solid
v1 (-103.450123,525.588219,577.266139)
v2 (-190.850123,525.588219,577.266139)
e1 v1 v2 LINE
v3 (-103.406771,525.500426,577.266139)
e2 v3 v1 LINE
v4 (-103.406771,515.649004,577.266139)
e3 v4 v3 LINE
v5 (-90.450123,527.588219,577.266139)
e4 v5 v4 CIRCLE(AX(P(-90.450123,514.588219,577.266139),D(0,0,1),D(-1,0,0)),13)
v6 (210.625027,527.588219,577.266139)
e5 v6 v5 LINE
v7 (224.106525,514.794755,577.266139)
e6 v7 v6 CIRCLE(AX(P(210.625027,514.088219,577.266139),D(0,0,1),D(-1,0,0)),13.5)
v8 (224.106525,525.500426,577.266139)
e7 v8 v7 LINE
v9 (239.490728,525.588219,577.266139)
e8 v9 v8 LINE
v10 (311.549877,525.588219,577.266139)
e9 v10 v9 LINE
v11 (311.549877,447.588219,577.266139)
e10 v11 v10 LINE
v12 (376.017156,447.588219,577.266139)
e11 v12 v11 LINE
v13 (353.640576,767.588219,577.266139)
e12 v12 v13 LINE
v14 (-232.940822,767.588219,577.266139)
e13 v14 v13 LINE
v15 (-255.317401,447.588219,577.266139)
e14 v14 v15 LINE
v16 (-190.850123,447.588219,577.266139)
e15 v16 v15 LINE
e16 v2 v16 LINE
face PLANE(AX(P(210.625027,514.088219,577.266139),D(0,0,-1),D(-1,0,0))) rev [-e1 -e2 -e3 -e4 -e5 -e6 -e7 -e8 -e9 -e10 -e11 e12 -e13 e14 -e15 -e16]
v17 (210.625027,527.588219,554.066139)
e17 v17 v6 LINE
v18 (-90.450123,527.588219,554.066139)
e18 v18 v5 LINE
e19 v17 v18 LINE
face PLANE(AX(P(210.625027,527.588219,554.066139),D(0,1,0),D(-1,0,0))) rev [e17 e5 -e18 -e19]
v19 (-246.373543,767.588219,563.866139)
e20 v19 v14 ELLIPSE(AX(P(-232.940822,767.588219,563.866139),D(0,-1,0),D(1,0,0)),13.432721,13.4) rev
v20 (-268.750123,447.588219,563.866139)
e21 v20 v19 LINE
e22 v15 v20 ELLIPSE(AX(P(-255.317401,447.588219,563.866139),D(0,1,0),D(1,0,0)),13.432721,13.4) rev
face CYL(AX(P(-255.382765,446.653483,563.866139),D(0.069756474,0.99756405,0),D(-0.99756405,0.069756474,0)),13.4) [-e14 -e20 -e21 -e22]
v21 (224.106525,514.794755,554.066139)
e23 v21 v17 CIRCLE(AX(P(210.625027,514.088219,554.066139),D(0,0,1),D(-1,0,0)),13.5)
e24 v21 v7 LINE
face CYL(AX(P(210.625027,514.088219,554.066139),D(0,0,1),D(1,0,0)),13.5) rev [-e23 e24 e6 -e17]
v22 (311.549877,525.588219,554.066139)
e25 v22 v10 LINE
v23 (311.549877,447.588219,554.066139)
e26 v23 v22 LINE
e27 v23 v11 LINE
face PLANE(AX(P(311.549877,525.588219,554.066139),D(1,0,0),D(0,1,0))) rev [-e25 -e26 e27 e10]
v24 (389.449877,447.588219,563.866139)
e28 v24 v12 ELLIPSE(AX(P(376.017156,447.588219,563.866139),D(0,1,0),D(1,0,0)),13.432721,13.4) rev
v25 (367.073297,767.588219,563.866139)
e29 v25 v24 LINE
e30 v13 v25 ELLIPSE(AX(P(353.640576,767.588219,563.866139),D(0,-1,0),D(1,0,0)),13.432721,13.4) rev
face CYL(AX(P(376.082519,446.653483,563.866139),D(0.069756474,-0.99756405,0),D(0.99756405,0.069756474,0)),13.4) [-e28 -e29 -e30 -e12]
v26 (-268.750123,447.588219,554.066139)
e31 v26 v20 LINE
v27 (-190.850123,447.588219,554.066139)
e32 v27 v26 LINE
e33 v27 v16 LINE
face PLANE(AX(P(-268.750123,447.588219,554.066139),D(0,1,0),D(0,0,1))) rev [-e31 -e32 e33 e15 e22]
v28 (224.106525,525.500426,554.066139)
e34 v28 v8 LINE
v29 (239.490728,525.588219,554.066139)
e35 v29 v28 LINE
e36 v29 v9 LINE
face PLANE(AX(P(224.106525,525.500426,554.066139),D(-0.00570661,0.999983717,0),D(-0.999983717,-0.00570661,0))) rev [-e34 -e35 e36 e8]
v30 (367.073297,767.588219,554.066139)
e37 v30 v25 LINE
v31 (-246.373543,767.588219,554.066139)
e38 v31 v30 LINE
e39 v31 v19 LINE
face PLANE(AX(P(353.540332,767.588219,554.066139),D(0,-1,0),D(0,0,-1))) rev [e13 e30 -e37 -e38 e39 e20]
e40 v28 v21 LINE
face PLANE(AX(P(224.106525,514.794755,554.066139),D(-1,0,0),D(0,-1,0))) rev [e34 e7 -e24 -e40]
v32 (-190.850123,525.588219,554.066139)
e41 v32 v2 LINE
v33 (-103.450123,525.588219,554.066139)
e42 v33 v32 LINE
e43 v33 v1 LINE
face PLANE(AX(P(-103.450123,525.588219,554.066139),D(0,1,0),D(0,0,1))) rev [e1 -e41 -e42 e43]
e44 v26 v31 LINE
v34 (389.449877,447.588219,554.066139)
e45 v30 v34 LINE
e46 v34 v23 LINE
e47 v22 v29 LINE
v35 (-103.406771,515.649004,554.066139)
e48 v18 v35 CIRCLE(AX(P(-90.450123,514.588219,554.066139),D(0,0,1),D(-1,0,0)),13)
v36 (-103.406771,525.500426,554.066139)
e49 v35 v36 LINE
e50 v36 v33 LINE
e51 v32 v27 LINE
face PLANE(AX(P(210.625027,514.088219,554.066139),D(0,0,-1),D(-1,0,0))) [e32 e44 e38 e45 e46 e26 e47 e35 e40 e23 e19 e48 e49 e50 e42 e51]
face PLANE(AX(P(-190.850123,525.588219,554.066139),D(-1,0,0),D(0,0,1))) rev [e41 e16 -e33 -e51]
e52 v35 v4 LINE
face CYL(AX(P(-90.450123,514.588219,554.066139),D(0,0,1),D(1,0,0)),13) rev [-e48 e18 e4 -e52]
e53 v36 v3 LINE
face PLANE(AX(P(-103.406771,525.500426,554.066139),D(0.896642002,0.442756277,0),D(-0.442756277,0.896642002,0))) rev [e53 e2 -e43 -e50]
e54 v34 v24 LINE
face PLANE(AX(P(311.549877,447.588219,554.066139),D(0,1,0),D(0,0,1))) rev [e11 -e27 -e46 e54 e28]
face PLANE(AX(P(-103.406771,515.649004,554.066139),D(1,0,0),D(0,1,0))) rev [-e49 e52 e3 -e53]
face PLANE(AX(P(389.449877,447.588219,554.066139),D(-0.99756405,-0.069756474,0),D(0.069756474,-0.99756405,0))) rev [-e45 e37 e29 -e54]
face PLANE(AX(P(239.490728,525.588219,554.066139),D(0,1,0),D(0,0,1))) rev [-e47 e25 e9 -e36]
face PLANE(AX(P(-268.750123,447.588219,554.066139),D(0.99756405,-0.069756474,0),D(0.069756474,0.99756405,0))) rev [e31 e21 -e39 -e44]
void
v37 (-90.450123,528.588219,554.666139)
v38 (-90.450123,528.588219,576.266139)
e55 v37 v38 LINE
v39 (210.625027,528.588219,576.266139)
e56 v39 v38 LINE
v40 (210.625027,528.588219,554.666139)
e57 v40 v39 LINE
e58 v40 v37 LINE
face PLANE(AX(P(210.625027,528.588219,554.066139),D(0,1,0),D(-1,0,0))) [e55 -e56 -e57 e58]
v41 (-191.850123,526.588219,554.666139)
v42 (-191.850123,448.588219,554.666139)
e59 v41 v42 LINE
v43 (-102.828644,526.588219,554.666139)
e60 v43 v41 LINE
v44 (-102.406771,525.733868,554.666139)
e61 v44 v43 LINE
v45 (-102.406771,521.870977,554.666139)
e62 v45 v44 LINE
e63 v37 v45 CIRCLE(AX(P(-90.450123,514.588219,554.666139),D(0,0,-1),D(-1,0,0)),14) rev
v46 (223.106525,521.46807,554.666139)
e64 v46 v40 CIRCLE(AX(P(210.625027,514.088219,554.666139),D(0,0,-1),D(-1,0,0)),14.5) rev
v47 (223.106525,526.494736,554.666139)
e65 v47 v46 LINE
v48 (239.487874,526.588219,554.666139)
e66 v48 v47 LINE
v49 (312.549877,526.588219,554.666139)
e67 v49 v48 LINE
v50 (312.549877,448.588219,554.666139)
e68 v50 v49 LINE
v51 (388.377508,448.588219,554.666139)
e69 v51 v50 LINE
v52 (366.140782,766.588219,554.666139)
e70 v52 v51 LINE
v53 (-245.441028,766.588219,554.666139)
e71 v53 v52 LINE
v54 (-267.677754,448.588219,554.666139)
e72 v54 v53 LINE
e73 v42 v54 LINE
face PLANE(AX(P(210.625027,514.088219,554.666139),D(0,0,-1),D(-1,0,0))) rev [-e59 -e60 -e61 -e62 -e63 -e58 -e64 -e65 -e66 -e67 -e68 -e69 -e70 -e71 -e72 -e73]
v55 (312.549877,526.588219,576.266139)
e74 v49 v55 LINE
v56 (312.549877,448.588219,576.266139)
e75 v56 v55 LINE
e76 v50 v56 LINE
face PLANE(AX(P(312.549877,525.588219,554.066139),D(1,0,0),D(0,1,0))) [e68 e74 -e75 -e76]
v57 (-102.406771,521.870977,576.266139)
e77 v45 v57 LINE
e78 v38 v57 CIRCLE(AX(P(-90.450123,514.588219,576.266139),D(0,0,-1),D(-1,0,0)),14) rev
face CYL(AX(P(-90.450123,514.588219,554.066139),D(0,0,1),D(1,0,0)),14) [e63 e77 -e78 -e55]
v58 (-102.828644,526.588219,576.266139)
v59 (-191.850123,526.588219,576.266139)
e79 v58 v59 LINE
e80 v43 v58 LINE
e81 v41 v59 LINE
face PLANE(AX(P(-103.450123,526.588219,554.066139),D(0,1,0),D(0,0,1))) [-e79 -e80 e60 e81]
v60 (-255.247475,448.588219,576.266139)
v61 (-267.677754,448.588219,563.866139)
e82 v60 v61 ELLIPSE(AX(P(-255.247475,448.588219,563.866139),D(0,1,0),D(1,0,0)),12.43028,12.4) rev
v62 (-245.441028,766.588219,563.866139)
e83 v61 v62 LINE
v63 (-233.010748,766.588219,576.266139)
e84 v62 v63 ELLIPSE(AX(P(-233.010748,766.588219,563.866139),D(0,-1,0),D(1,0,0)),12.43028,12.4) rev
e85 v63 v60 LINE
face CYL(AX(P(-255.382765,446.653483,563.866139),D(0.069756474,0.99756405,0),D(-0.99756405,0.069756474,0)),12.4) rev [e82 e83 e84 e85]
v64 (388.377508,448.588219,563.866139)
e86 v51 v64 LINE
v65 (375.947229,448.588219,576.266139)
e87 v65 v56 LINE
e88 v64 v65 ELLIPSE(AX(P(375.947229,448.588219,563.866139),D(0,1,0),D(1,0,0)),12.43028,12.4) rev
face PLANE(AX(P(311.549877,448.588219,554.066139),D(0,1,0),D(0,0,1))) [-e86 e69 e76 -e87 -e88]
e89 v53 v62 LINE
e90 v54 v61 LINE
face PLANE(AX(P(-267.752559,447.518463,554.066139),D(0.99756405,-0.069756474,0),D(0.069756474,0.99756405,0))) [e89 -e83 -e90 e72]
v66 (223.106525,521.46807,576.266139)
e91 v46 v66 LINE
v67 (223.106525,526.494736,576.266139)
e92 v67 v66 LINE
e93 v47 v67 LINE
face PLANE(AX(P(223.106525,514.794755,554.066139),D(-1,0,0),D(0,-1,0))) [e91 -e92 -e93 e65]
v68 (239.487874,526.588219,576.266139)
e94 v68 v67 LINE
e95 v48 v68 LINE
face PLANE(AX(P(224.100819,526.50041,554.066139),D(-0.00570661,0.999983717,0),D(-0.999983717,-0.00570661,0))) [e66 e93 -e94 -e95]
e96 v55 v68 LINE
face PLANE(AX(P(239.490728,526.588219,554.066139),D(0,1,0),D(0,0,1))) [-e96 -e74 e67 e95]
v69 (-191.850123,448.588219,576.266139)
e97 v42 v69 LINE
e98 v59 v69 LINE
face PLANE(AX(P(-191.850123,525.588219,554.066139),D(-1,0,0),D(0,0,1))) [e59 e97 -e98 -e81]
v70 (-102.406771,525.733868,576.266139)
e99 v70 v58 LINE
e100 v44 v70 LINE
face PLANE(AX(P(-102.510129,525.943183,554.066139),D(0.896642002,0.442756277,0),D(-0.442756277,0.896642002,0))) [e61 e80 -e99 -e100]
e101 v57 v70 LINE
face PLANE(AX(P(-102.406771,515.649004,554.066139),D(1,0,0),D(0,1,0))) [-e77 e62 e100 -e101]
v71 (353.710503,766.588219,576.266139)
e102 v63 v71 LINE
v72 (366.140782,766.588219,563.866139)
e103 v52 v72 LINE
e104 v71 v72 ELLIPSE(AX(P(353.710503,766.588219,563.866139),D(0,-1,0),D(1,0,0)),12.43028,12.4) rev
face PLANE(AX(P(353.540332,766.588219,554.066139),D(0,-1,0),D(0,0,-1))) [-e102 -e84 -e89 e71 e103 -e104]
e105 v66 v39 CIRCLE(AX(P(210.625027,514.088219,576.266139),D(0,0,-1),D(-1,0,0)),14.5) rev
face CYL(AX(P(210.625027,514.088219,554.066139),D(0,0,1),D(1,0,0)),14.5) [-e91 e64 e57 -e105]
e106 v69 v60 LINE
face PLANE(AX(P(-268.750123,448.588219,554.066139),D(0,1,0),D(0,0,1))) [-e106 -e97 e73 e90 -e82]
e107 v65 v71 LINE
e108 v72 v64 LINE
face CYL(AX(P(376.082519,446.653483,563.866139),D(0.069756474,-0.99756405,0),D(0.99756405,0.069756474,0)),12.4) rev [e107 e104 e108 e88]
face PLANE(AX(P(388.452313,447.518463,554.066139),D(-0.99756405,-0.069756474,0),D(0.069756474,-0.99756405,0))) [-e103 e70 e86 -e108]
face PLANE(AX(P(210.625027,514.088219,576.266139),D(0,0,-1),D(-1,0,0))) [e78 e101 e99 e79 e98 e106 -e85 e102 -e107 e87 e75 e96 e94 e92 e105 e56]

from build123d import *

# Parameters (mm, degrees)
BOSS_EXTRUDE1_DEPTH = 23.2
FILLET1_R           = 13.4
SHELL1_START        = 554.066138639
SHELL1_DEPTH        = 22.2
SHELL1_START_2      = -740.047251584
SHELL1_2_DEPTH      = 319.643616058
SHELL1_START_3      = 428.823224764
SHELL1_3_DEPTH      = 319.643616058
BOSS_EXTRUDE2_START = -0.6
BOSS_EXTRUDE2_DEPTH = 0.6


with BuildPart() as part:
    # Sketch1 → Boss-Extrude1 (new body)
    with BuildSketch(Plane(origin=(0, 0, 577.266138639), x_dir=(-1, 0, 0), z_dir=(0, 0, -1))):
        with BuildLine():
            Line((246.373543052, 767.588219351), (232.840577428, 767.588219351))
            Line((232.840577428, 767.588219351), (221.373543052, 767.588219351))
            Line((221.373543052, 767.588219351), (-342.073297304, 767.588219351))
            Line((-342.073297304, 767.588219351), (-353.54033168, 767.588219351))
            Line((-353.54033168, 767.588219351), (-367.073297304, 767.588219351))
            Line((-367.073297304, 767.588219351), (-389.449877126, 447.588219351))
            Line((-389.449877126, 447.588219351), (-375.949877126, 447.588219351))
            Line((-375.949877126, 447.588219351), (-364.449877126, 447.588219351))
            Line((-364.449877126, 447.588219351), (-311.549877126, 447.588219351))
            Line((-311.549877126, 447.588219351), (-311.549877126, 525.588219351))
            Line((-311.549877126, 525.588219351), (-311.490727804, 525.588219351))
            Line((-311.490727804, 525.588219351), (-239.490727804, 525.588219351))
            Line((-239.490727804, 525.588219351), (-224.106525446, 525.500426272))
            Line((-224.106525446, 525.500426272), (-224.106525446, 514.79475476))
            ThreePointArc((-224.106525446, 514.79475476), (-219.917813499, 523.880773359), (-210.625026727, 527.588219351))
            Line((-210.625026727, 527.588219351), (90.450122874, 527.588219351))
            ThreePointArc((90.450122874, 527.588219351), (99.259487157, 524.148297851), (103.406771195, 515.649004109))
            Line((103.406771195, 515.649004109), (103.406771195, 525.500426272))
            Line((103.406771195, 525.500426272), (103.450122874, 525.588219351))
            Line((103.450122874, 525.588219351), (190.850122874, 525.588219351))
            Line((190.850122874, 525.588219351), (190.850122874, 447.588219351))
            Line((190.850122874, 447.588219351), (243.750122874, 447.588219351))
            Line((243.750122874, 447.588219351), (255.21715725, 447.588219351))
            Line((255.21715725, 447.588219351), (255.250122874, 447.588219351))
            Line((255.250122874, 447.588219351), (268.750122874, 447.588219351))
            Line((268.750122874, 447.588219351), (246.373543052, 767.588219351))
        make_face()
    extrude(amount=BOSS_EXTRUDE1_DEPTH)

    # Fillet1
    fillet1_edges = [part.edges().sort_by_distance(p)[0] for p in [
        (378.261587215, 607.588219351, 577.266138639),
        (-257.561832963, 607.588219351, 577.266138639),
    ]]
    fillet(fillet1_edges, radius=FILLET1_R)

    # Shell1: read off the stored shape, not the designer's step
    # Shell1 outline → Shell1 (cut)
    with BuildSketch(Plane.XY.offset(SHELL1_START)):
        with BuildLine():
            Line((-245.441027966, 766.588219351), (-267.677754164, 448.588219351))
            Line((-267.677754164, 448.588219351), (-191.850122874, 448.588219351))
            Line((-191.850122874, 448.588219351), (-191.850122874, 526.588219351))
            Line((-191.850122874, 526.588219351), (-102.828644378, 526.588219351))
            Line((-102.828644378, 526.588219351), (-102.406771195, 525.73386847))
            Line((-102.406771195, 525.73386847), (-102.406771195, 521.870977135))
            ThreePointArc((-102.406771195, 521.870977135), (-97.307286684, 526.793927216), (-90.450122874, 528.588219351))
            Line((-90.450122874, 528.588219351), (210.625026727, 528.588219351))
            ThreePointArc((210.625026727, 528.588219351), (217.80980826, 526.683016464), (223.106525446, 521.468069601))
            Line((223.106525446, 521.468069601), (223.106525446, 526.494735851))
            Line((223.106525446, 526.494735851), (239.487874476, 526.588219351))
            Line((239.487874476, 526.588219351), (312.549877126, 526.588219351))
            Line((312.549877126, 526.588219351), (312.549877126, 448.588219351))
            Line((312.549877126, 448.588219351), (388.377508416, 448.588219351))
            Line((388.377508416, 448.588219351), (366.140782218, 766.588219351))
            Line((366.140782218, 766.588219351), (-245.441027966, 766.588219351))
        make_face()
    extrude(amount=SHELL1_DEPTH, mode=Mode.SUBTRACT)

    # Shell1 2 outline → Shell1 2 (add)
    with BuildSketch(Plane(origin=(0, 0, 0), x_dir=(0.9975640502598233, 0.06975647374413793, 0), z_dir=(0.06975647374413793, -0.9975640502598234, 0)).offset(SHELL1_START_2)):
        with BuildLine():
            ThreePointArc((406.32337267, 576.266138639), (415.091496757, 572.634262726), (418.72337267, 563.866138639))
            Line((418.72337267, 563.866138639), (418.72337267, 568.945508678))
            ThreePointArc((418.72337267, 568.945508678), (415.798603538, 573.341369507), (411.40274271, 576.266138639))
            Line((411.40274271, 576.266138639), (406.32337267, 576.266138639))
        make_face()
    extrude(amount=SHELL1_2_DEPTH)

    # Shell1 3 outline → Shell1 3 (add)
    with BuildSketch(Plane(origin=(0, 0, 0), x_dir=(0.9975640502598233, -0.06975647374413843, 0), z_dir=(0.06975647374413843, 0.9975640502598233, 0)).offset(SHELL1_START_3)):
        with BuildLine():
            ThreePointArc((-285.917636954, -576.266138639), (-294.68576104, -572.634262725), (-298.317636954, -563.866138639))
            Line((-298.317636954, -563.866138639), (-298.317636953, -568.94550868))
            ThreePointArc((-298.317636953, -568.94550868), (-295.392867822, -573.341369507), (-290.997006994, -576.266138639))
            Line((-290.997006994, -576.266138639), (-285.917636954, -576.266138639))
        make_face()
    extrude(amount=SHELL1_3_DEPTH)

    # Sketch2 → Boss-Extrude2 (add)
    with BuildSketch(Plane(origin=(0, 0, 554.066138639), x_dir=(-1, 0, 0), z_dir=(0, 0, -1)).offset(BOSS_EXTRUDE2_START)):
        with BuildLine():
            Line((246.373543052, 767.588219351), (-367.073297304, 767.588219351))
            Line((-367.073297304, 767.588219351), (-389.449877126, 447.588219351))
            Line((-389.449877126, 447.588219351), (-311.549877126, 447.588219351))
            Line((-311.549877126, 447.588219351), (-311.549877126, 525.588219351))
            Line((-311.549877126, 525.588219351), (-311.312198799, 525.588219351))
            Line((-311.312198799, 525.588219351), (-239.490727804, 525.588219351))
            Line((-239.490727804, 525.588219351), (-224.106525446, 525.500426272))
            Line((-224.106525446, 525.500426272), (-224.106525446, 514.79475476))
            ThreePointArc((-224.106525446, 514.79475476), (-219.917813499, 523.880773359), (-210.625026727, 527.588219351))
            Line((-210.625026727, 527.588219351), (90.450122874, 527.588219351))
            ThreePointArc((90.450122874, 527.588219351), (99.259487157, 524.148297851), (103.406771195, 515.649004109))
            Line((103.406771195, 515.649004109), (103.406771195, 525.500426272))
            Line((103.406771195, 525.500426272), (103.450122874, 525.588219351))
            Line((103.450122874, 525.588219351), (190.612444548, 525.588219351))
            Line((190.612444548, 525.588219351), (190.850122874, 525.588219351))
            Line((190.850122874, 525.588219351), (190.850122874, 525.176548414))
            Line((190.850122874, 525.176548414), (190.850122874, 447.588219351))
            Line((190.850122874, 447.588219351), (268.750122874, 447.588219351))
            Line((268.750122874, 447.588219351), (246.373543052, 767.588219351))
        make_face()
    extrude(amount=BOSS_EXTRUDE2_DEPTH)


solid = part.part
